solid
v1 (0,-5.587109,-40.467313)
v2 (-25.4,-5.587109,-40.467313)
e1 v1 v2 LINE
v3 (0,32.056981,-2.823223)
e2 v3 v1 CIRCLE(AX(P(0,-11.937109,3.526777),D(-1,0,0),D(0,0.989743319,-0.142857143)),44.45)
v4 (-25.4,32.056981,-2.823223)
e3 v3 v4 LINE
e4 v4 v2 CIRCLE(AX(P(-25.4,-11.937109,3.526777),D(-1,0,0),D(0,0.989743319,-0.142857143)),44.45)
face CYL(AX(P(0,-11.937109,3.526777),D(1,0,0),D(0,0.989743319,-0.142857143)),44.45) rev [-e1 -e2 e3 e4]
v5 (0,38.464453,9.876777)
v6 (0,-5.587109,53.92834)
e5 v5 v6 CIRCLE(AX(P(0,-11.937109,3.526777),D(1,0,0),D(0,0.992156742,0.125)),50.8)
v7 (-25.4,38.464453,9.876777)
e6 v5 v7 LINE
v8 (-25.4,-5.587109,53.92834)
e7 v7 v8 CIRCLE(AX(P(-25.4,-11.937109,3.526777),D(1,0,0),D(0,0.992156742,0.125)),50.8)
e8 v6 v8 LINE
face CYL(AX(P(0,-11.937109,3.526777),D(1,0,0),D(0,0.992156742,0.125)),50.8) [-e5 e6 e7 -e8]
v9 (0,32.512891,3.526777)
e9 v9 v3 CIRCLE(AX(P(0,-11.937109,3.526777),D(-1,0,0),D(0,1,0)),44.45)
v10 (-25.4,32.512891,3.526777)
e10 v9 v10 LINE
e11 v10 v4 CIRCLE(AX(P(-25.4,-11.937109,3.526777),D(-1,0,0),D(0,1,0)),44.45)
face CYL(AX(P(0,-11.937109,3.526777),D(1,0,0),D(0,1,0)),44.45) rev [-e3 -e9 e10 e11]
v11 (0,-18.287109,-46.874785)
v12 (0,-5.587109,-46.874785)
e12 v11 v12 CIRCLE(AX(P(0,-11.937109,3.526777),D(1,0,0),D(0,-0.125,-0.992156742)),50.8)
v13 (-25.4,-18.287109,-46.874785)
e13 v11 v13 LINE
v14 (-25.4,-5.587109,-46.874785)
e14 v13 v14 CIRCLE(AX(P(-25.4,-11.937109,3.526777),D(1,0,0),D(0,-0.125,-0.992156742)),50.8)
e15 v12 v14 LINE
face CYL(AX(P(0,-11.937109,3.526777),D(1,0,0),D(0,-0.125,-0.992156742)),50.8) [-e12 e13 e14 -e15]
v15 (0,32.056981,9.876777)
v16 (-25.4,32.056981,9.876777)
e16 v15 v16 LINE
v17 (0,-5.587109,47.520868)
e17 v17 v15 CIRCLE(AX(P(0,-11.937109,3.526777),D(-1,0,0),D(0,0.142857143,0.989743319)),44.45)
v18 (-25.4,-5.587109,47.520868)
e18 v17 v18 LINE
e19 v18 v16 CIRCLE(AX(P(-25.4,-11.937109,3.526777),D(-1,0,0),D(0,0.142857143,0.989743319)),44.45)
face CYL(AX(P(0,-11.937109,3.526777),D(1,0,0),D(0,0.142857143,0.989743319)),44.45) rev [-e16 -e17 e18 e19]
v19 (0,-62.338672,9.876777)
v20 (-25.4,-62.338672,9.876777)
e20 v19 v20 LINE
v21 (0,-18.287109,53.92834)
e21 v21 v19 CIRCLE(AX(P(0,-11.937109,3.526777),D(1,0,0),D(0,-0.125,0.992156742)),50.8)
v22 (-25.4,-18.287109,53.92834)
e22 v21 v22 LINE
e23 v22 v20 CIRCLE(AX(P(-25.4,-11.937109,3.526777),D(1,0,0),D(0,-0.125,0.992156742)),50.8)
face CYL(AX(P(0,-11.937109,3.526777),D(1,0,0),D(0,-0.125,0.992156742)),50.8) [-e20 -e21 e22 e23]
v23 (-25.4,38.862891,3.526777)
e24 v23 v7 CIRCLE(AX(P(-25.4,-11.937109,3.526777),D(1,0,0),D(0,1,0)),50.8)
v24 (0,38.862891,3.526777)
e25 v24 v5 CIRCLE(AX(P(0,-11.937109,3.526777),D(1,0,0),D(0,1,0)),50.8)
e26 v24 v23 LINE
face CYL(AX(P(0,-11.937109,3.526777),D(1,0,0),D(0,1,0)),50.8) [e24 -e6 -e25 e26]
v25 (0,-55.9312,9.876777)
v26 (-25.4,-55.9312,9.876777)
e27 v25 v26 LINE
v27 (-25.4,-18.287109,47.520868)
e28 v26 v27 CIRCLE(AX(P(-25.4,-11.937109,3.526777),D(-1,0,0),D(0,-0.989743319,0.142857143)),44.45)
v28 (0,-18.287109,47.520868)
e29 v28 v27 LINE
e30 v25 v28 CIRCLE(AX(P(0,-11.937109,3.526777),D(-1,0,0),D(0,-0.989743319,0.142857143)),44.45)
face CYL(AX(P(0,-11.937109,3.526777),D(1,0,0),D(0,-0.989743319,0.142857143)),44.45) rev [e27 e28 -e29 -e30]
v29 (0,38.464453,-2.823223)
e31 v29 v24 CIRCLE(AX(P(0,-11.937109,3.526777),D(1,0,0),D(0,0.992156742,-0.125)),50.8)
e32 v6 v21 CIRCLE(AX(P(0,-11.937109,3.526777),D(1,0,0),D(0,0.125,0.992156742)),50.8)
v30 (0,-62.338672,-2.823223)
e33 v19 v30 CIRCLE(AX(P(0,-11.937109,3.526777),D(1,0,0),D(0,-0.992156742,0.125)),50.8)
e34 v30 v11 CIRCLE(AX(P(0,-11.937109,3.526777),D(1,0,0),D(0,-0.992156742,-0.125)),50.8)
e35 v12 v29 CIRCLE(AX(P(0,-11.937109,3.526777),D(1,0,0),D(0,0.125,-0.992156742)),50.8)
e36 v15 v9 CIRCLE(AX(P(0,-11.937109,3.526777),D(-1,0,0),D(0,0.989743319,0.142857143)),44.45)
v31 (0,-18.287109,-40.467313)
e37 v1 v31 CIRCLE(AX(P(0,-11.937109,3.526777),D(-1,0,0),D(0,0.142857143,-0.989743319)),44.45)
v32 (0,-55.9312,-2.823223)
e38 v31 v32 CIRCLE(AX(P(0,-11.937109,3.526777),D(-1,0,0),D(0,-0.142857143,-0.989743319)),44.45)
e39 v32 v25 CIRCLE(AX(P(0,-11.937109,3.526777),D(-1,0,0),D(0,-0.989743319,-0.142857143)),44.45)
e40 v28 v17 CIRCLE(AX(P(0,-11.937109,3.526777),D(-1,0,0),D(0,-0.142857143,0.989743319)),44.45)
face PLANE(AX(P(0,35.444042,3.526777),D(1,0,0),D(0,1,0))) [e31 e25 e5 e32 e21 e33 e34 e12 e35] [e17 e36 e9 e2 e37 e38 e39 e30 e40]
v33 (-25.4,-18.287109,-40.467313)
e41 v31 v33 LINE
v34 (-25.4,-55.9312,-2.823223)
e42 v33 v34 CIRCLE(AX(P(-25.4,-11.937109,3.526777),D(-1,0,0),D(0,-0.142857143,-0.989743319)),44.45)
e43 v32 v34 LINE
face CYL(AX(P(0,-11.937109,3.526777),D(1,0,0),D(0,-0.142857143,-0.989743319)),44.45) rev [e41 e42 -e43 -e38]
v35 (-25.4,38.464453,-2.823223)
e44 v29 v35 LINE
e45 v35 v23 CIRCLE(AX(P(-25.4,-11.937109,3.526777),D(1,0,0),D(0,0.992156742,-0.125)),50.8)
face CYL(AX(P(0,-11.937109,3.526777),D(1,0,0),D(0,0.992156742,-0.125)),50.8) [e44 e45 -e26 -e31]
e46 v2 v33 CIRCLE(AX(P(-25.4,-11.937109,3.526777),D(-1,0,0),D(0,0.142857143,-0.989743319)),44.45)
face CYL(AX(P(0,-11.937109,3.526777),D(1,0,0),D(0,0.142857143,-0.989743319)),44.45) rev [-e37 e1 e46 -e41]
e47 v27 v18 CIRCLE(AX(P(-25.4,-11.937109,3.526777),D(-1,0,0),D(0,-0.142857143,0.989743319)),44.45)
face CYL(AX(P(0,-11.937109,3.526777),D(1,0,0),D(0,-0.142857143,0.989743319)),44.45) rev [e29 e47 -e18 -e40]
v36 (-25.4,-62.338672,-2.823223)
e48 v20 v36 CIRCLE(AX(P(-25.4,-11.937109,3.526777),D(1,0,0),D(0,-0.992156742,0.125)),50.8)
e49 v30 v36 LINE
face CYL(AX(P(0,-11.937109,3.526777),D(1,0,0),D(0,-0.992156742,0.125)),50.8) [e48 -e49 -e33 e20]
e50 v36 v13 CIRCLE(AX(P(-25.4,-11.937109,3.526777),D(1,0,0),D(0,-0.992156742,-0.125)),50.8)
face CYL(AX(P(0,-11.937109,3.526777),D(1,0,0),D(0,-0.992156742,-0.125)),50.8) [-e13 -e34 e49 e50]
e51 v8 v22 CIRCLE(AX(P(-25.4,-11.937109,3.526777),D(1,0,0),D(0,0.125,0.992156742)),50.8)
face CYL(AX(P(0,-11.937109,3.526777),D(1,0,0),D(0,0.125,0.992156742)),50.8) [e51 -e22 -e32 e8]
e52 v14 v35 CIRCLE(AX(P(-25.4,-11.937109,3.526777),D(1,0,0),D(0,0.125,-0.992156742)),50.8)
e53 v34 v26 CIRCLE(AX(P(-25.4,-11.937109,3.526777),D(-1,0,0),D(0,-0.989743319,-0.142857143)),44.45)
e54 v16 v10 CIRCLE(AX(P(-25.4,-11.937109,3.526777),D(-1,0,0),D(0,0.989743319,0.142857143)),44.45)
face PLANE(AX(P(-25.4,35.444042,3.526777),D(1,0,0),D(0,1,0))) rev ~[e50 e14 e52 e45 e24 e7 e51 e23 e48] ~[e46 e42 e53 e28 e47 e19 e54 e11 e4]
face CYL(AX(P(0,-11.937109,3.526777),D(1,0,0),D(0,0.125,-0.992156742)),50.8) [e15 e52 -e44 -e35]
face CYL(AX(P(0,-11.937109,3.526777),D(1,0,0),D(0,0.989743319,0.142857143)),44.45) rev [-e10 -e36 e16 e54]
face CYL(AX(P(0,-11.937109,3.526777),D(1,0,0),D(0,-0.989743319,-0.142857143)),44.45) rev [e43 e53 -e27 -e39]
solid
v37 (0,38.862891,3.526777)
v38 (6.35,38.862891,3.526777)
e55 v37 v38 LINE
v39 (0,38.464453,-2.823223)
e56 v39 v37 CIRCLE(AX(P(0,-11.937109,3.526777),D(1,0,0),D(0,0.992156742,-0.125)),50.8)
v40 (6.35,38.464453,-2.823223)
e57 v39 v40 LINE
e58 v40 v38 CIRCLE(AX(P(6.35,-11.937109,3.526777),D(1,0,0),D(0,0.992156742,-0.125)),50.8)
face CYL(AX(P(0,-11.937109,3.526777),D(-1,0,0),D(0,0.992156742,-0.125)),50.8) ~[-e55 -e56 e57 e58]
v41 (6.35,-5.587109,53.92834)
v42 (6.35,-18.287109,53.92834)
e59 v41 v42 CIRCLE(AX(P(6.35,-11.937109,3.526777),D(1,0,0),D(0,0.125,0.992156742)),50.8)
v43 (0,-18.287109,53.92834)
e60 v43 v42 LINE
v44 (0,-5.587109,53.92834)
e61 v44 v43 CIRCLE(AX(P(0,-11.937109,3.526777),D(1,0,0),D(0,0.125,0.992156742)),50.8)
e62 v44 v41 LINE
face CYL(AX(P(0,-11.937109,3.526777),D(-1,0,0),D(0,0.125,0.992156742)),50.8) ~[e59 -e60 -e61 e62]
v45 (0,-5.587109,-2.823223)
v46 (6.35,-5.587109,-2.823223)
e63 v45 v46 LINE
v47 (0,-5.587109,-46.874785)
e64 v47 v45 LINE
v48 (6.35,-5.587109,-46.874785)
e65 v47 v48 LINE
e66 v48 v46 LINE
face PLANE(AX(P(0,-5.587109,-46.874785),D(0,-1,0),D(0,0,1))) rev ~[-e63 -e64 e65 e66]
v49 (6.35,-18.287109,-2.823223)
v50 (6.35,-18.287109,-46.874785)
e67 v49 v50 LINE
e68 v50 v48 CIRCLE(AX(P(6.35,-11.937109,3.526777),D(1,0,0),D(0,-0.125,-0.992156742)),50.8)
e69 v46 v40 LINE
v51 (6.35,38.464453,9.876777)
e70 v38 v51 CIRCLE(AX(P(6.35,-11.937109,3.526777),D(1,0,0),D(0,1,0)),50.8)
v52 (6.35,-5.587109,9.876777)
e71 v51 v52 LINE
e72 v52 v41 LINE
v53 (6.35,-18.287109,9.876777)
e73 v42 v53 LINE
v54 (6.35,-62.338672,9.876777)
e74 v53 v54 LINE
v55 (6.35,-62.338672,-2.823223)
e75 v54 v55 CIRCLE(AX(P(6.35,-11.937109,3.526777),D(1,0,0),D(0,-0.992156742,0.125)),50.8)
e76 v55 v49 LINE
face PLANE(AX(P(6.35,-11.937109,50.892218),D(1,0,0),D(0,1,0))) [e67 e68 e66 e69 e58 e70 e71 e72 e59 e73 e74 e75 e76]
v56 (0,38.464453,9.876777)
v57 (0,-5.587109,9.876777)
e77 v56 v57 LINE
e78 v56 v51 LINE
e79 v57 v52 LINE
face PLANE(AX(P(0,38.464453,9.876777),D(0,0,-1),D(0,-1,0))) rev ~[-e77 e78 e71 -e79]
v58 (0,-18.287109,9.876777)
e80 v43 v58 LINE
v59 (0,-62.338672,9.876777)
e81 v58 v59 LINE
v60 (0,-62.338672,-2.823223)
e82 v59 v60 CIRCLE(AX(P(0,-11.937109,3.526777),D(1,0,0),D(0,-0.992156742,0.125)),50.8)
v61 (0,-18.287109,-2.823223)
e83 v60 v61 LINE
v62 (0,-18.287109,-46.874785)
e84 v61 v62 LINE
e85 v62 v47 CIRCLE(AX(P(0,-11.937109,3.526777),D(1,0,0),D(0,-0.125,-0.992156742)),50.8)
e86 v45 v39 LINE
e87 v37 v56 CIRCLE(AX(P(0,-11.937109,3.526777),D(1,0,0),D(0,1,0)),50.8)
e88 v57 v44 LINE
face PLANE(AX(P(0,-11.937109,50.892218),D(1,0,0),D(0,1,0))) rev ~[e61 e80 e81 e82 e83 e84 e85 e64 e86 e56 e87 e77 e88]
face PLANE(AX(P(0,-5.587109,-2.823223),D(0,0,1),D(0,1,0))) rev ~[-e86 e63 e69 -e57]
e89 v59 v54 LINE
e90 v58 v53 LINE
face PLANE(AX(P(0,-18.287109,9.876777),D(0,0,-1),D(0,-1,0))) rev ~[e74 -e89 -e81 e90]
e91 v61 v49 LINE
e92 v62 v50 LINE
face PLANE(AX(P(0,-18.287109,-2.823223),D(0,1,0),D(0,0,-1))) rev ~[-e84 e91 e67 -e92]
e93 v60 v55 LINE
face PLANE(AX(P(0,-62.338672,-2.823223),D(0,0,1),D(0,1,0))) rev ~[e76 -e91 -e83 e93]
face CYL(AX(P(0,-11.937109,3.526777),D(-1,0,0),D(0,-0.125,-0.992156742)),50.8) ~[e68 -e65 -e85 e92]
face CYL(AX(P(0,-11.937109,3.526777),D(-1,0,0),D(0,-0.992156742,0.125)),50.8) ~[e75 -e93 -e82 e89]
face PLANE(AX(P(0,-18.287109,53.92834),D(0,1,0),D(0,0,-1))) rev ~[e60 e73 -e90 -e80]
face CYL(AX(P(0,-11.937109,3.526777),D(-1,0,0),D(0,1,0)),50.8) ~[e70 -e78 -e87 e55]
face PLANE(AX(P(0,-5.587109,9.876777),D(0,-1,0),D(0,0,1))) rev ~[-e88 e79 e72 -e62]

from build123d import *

# Parameters (mm, degrees)
F1_DEPTH = 6.3499999233
F2_DEPTH = 25.4


with BuildPart() as f1:
    # F0 (on Right) → F1 (new body)
    with BuildSketch(Plane.YZ):
        with BuildLine():
            Line((-5.5871092111, 47.5208675413), (-5.5871092111, 53.9283395048))
            ThreePointArc((-5.5871092111, 53.9283395048), (-11.9371092111, 54.326777029), (-18.2871092111, 53.9283395048))
            Line((-18.2871092111, 53.9283395048), (-18.2871092111, 47.5208675413))
            ThreePointArc((-18.2871092111, 47.5208675413), (-11.9371092111, 47.976777029), (-5.5871092111, 47.5208675413))
        make_face()
        with BuildLine():
            ThreePointArc((32.5128907889, 3.526777029), (32.3987669124, 6.7099497176), (32.0569813012, 9.876777029))
            Line((32.0569813012, 9.876777029), (-5.5871092111, 9.876777029))
            Line((-5.5871092111, 9.876777029), (-5.5871092111, 47.5208675413))
            ThreePointArc((-5.5871092111, 47.5208675413), (-11.9371092111, 47.976777029), (-18.2871092111, 47.5208675413))
            Line((-18.2871092111, 47.5208675413), (-18.2871092111, 9.876777029))
            Line((-18.2871092111, 9.876777029), (-55.9311997233, 9.876777029))
            ThreePointArc((-55.9311997233, 9.876777029), (-56.3871092111, 3.526777029), (-55.9311997233, -2.823222971))
            Line((-55.9311997233, -2.823222971), (-18.2871092111, -2.823222971))
            Line((-18.2871092111, -2.823222971), (-18.2871092111, -40.4673134832))
            ThreePointArc((-18.2871092111, -40.4673134832), (-11.9371092111, -40.923222971), (-5.5871092111, -40.4673134832))
            Line((-5.5871092111, -40.4673134832), (-5.5871092111, -2.823222971))
            Line((-5.5871092111, -2.823222971), (32.0569813012, -2.823222971))
            ThreePointArc((32.0569813012, -2.823222971), (32.3987669124, 0.3436043405), (32.5128907889, 3.526777029))
        make_face()
        with BuildLine():
            Line((-55.9311997233, 9.876777029), (-62.3386716869, 9.876777029))
            ThreePointArc((-62.3386716869, 9.876777029), (-62.7371092111, 3.526777029), (-62.3386716869, -2.823222971))
            Line((-62.3386716869, -2.823222971), (-55.9311997233, -2.823222971))
            ThreePointArc((-55.9311997233, -2.823222971), (-56.3871092111, 3.526777029), (-55.9311997233, 9.876777029))
        make_face()
        with BuildLine():
            ThreePointArc((38.4644532647, -2.823222971), (38.7631835581, 0.3455330718), (38.8628907889, 3.526777029))
            ThreePointArc((38.8628907889, 3.526777029), (38.7631835581, 6.7080209862), (38.4644532647, 9.876777029))
            Line((38.4644532647, 9.876777029), (32.0569813012, 9.876777029))
            ThreePointArc((32.0569813012, 9.876777029), (32.3987669124, 6.7099497176), (32.5128907889, 3.526777029))
            ThreePointArc((32.5128907889, 3.526777029), (32.3987669124, 0.3436043405), (32.0569813012, -2.823222971))
            Line((32.0569813012, -2.823222971), (38.4644532647, -2.823222971))
        make_face()
        with BuildLine():
            ThreePointArc((-18.2871092111, -46.8747854467), (-11.9371092111, -47.273222971), (-5.5871092111, -46.8747854467))
            Line((-5.5871092111, -46.8747854467), (-5.5871092111, -40.4673134832))
            ThreePointArc((-5.5871092111, -40.4673134832), (-11.9371092111, -40.923222971), (-18.2871092111, -40.4673134832))
            Line((-18.2871092111, -40.4673134832), (-18.2871092111, -46.8747854467))
        make_face()
    extrude(amount=F1_DEPTH)


with BuildPart() as f2:
    # F0 (on Right) → F2 (new body)
    with BuildSketch(Plane.YZ):
        with BuildLine():
            ThreePointArc((38.4644532647, -2.823222971), (38.7631835581, 0.3455330718), (38.8628907889, 3.526777029))
            ThreePointArc((38.8628907889, 3.526777029), (38.7631835581, 6.7080209862), (38.4644532647, 9.876777029))
            Line((38.4644532647, 9.876777029), (32.0569813012, 9.876777029))
            ThreePointArc((32.0569813012, 9.876777029), (32.3987669124, 6.7099497176), (32.5128907889, 3.526777029))
            ThreePointArc((32.5128907889, 3.526777029), (32.3987669124, 0.3436043405), (32.0569813012, -2.823222971))
            Line((32.0569813012, -2.823222971), (38.4644532647, -2.823222971))
        make_face()
        with BuildLine():
            Line((32.0569813012, 9.876777029), (38.4644532647, 9.876777029))
            ThreePointArc((38.4644532647, 9.876777029), (23.9839152732, 39.4478015133), (-5.5871092111, 53.9283395048))
            Line((-5.5871092111, 53.9283395048), (-5.5871092111, 47.5208675413))
            ThreePointArc((-5.5871092111, 47.5208675413), (19.4937872127, 34.9576734528), (32.0569813012, 9.876777029))
        make_face()
        with BuildLine():
            ThreePointArc((-5.5871092111, -46.8747854467), (23.9839152732, -32.3942474552), (38.4644532647, -2.823222971))
            Line((38.4644532647, -2.823222971), (32.0569813012, -2.823222971))
            ThreePointArc((32.0569813012, -2.823222971), (19.4937872127, -27.9041193947), (-5.5871092111, -40.4673134832))
            Line((-5.5871092111, -40.4673134832), (-5.5871092111, -46.8747854467))
        make_face()
        with BuildLine():
            Line((-5.5871092111, 47.5208675413), (-5.5871092111, 53.9283395048))
            ThreePointArc((-5.5871092111, 53.9283395048), (-11.9371092111, 54.326777029), (-18.2871092111, 53.9283395048))
            Line((-18.2871092111, 53.9283395048), (-18.2871092111, 47.5208675413))
            ThreePointArc((-18.2871092111, 47.5208675413), (-11.9371092111, 47.976777029), (-5.5871092111, 47.5208675413))
        make_face()
        with BuildLine():
            ThreePointArc((-18.2871092111, -46.8747854467), (-11.9371092111, -47.273222971), (-5.5871092111, -46.8747854467))
            Line((-5.5871092111, -46.8747854467), (-5.5871092111, -40.4673134832))
            ThreePointArc((-5.5871092111, -40.4673134832), (-11.9371092111, -40.923222971), (-18.2871092111, -40.4673134832))
            Line((-18.2871092111, -40.4673134832), (-18.2871092111, -46.8747854467))
        make_face()
        with BuildLine():
            Line((-18.2871092111, 47.5208675413), (-18.2871092111, 53.9283395048))
            ThreePointArc((-18.2871092111, 53.9283395048), (-47.8581336954, 39.4478015133), (-62.3386716869, 9.876777029))
            Line((-62.3386716869, 9.876777029), (-55.9311997233, 9.876777029))
            ThreePointArc((-55.9311997233, 9.876777029), (-43.3680056348, 34.9576734528), (-18.2871092111, 47.5208675413))
        make_face()
        with BuildLine():
            ThreePointArc((-62.3386716869, -2.823222971), (-47.8581336954, -32.3942474552), (-18.2871092111, -46.8747854467))
            Line((-18.2871092111, -46.8747854467), (-18.2871092111, -40.4673134832))
            ThreePointArc((-18.2871092111, -40.4673134832), (-43.3680056348, -27.9041193947), (-55.9311997233, -2.823222971))
            Line((-55.9311997233, -2.823222971), (-62.3386716869, -2.823222971))
        make_face()
        with BuildLine():
            Line((-55.9311997233, 9.876777029), (-62.3386716869, 9.876777029))
            ThreePointArc((-62.3386716869, 9.876777029), (-62.7371092111, 3.526777029), (-62.3386716869, -2.823222971))
            Line((-62.3386716869, -2.823222971), (-55.9311997233, -2.823222971))
            ThreePointArc((-55.9311997233, -2.823222971), (-56.3871092111, 3.526777029), (-55.9311997233, 9.876777029))
        make_face()
    extrude(amount=-F2_DEPTH)


solid = Compound([f1.part, f2.part])
